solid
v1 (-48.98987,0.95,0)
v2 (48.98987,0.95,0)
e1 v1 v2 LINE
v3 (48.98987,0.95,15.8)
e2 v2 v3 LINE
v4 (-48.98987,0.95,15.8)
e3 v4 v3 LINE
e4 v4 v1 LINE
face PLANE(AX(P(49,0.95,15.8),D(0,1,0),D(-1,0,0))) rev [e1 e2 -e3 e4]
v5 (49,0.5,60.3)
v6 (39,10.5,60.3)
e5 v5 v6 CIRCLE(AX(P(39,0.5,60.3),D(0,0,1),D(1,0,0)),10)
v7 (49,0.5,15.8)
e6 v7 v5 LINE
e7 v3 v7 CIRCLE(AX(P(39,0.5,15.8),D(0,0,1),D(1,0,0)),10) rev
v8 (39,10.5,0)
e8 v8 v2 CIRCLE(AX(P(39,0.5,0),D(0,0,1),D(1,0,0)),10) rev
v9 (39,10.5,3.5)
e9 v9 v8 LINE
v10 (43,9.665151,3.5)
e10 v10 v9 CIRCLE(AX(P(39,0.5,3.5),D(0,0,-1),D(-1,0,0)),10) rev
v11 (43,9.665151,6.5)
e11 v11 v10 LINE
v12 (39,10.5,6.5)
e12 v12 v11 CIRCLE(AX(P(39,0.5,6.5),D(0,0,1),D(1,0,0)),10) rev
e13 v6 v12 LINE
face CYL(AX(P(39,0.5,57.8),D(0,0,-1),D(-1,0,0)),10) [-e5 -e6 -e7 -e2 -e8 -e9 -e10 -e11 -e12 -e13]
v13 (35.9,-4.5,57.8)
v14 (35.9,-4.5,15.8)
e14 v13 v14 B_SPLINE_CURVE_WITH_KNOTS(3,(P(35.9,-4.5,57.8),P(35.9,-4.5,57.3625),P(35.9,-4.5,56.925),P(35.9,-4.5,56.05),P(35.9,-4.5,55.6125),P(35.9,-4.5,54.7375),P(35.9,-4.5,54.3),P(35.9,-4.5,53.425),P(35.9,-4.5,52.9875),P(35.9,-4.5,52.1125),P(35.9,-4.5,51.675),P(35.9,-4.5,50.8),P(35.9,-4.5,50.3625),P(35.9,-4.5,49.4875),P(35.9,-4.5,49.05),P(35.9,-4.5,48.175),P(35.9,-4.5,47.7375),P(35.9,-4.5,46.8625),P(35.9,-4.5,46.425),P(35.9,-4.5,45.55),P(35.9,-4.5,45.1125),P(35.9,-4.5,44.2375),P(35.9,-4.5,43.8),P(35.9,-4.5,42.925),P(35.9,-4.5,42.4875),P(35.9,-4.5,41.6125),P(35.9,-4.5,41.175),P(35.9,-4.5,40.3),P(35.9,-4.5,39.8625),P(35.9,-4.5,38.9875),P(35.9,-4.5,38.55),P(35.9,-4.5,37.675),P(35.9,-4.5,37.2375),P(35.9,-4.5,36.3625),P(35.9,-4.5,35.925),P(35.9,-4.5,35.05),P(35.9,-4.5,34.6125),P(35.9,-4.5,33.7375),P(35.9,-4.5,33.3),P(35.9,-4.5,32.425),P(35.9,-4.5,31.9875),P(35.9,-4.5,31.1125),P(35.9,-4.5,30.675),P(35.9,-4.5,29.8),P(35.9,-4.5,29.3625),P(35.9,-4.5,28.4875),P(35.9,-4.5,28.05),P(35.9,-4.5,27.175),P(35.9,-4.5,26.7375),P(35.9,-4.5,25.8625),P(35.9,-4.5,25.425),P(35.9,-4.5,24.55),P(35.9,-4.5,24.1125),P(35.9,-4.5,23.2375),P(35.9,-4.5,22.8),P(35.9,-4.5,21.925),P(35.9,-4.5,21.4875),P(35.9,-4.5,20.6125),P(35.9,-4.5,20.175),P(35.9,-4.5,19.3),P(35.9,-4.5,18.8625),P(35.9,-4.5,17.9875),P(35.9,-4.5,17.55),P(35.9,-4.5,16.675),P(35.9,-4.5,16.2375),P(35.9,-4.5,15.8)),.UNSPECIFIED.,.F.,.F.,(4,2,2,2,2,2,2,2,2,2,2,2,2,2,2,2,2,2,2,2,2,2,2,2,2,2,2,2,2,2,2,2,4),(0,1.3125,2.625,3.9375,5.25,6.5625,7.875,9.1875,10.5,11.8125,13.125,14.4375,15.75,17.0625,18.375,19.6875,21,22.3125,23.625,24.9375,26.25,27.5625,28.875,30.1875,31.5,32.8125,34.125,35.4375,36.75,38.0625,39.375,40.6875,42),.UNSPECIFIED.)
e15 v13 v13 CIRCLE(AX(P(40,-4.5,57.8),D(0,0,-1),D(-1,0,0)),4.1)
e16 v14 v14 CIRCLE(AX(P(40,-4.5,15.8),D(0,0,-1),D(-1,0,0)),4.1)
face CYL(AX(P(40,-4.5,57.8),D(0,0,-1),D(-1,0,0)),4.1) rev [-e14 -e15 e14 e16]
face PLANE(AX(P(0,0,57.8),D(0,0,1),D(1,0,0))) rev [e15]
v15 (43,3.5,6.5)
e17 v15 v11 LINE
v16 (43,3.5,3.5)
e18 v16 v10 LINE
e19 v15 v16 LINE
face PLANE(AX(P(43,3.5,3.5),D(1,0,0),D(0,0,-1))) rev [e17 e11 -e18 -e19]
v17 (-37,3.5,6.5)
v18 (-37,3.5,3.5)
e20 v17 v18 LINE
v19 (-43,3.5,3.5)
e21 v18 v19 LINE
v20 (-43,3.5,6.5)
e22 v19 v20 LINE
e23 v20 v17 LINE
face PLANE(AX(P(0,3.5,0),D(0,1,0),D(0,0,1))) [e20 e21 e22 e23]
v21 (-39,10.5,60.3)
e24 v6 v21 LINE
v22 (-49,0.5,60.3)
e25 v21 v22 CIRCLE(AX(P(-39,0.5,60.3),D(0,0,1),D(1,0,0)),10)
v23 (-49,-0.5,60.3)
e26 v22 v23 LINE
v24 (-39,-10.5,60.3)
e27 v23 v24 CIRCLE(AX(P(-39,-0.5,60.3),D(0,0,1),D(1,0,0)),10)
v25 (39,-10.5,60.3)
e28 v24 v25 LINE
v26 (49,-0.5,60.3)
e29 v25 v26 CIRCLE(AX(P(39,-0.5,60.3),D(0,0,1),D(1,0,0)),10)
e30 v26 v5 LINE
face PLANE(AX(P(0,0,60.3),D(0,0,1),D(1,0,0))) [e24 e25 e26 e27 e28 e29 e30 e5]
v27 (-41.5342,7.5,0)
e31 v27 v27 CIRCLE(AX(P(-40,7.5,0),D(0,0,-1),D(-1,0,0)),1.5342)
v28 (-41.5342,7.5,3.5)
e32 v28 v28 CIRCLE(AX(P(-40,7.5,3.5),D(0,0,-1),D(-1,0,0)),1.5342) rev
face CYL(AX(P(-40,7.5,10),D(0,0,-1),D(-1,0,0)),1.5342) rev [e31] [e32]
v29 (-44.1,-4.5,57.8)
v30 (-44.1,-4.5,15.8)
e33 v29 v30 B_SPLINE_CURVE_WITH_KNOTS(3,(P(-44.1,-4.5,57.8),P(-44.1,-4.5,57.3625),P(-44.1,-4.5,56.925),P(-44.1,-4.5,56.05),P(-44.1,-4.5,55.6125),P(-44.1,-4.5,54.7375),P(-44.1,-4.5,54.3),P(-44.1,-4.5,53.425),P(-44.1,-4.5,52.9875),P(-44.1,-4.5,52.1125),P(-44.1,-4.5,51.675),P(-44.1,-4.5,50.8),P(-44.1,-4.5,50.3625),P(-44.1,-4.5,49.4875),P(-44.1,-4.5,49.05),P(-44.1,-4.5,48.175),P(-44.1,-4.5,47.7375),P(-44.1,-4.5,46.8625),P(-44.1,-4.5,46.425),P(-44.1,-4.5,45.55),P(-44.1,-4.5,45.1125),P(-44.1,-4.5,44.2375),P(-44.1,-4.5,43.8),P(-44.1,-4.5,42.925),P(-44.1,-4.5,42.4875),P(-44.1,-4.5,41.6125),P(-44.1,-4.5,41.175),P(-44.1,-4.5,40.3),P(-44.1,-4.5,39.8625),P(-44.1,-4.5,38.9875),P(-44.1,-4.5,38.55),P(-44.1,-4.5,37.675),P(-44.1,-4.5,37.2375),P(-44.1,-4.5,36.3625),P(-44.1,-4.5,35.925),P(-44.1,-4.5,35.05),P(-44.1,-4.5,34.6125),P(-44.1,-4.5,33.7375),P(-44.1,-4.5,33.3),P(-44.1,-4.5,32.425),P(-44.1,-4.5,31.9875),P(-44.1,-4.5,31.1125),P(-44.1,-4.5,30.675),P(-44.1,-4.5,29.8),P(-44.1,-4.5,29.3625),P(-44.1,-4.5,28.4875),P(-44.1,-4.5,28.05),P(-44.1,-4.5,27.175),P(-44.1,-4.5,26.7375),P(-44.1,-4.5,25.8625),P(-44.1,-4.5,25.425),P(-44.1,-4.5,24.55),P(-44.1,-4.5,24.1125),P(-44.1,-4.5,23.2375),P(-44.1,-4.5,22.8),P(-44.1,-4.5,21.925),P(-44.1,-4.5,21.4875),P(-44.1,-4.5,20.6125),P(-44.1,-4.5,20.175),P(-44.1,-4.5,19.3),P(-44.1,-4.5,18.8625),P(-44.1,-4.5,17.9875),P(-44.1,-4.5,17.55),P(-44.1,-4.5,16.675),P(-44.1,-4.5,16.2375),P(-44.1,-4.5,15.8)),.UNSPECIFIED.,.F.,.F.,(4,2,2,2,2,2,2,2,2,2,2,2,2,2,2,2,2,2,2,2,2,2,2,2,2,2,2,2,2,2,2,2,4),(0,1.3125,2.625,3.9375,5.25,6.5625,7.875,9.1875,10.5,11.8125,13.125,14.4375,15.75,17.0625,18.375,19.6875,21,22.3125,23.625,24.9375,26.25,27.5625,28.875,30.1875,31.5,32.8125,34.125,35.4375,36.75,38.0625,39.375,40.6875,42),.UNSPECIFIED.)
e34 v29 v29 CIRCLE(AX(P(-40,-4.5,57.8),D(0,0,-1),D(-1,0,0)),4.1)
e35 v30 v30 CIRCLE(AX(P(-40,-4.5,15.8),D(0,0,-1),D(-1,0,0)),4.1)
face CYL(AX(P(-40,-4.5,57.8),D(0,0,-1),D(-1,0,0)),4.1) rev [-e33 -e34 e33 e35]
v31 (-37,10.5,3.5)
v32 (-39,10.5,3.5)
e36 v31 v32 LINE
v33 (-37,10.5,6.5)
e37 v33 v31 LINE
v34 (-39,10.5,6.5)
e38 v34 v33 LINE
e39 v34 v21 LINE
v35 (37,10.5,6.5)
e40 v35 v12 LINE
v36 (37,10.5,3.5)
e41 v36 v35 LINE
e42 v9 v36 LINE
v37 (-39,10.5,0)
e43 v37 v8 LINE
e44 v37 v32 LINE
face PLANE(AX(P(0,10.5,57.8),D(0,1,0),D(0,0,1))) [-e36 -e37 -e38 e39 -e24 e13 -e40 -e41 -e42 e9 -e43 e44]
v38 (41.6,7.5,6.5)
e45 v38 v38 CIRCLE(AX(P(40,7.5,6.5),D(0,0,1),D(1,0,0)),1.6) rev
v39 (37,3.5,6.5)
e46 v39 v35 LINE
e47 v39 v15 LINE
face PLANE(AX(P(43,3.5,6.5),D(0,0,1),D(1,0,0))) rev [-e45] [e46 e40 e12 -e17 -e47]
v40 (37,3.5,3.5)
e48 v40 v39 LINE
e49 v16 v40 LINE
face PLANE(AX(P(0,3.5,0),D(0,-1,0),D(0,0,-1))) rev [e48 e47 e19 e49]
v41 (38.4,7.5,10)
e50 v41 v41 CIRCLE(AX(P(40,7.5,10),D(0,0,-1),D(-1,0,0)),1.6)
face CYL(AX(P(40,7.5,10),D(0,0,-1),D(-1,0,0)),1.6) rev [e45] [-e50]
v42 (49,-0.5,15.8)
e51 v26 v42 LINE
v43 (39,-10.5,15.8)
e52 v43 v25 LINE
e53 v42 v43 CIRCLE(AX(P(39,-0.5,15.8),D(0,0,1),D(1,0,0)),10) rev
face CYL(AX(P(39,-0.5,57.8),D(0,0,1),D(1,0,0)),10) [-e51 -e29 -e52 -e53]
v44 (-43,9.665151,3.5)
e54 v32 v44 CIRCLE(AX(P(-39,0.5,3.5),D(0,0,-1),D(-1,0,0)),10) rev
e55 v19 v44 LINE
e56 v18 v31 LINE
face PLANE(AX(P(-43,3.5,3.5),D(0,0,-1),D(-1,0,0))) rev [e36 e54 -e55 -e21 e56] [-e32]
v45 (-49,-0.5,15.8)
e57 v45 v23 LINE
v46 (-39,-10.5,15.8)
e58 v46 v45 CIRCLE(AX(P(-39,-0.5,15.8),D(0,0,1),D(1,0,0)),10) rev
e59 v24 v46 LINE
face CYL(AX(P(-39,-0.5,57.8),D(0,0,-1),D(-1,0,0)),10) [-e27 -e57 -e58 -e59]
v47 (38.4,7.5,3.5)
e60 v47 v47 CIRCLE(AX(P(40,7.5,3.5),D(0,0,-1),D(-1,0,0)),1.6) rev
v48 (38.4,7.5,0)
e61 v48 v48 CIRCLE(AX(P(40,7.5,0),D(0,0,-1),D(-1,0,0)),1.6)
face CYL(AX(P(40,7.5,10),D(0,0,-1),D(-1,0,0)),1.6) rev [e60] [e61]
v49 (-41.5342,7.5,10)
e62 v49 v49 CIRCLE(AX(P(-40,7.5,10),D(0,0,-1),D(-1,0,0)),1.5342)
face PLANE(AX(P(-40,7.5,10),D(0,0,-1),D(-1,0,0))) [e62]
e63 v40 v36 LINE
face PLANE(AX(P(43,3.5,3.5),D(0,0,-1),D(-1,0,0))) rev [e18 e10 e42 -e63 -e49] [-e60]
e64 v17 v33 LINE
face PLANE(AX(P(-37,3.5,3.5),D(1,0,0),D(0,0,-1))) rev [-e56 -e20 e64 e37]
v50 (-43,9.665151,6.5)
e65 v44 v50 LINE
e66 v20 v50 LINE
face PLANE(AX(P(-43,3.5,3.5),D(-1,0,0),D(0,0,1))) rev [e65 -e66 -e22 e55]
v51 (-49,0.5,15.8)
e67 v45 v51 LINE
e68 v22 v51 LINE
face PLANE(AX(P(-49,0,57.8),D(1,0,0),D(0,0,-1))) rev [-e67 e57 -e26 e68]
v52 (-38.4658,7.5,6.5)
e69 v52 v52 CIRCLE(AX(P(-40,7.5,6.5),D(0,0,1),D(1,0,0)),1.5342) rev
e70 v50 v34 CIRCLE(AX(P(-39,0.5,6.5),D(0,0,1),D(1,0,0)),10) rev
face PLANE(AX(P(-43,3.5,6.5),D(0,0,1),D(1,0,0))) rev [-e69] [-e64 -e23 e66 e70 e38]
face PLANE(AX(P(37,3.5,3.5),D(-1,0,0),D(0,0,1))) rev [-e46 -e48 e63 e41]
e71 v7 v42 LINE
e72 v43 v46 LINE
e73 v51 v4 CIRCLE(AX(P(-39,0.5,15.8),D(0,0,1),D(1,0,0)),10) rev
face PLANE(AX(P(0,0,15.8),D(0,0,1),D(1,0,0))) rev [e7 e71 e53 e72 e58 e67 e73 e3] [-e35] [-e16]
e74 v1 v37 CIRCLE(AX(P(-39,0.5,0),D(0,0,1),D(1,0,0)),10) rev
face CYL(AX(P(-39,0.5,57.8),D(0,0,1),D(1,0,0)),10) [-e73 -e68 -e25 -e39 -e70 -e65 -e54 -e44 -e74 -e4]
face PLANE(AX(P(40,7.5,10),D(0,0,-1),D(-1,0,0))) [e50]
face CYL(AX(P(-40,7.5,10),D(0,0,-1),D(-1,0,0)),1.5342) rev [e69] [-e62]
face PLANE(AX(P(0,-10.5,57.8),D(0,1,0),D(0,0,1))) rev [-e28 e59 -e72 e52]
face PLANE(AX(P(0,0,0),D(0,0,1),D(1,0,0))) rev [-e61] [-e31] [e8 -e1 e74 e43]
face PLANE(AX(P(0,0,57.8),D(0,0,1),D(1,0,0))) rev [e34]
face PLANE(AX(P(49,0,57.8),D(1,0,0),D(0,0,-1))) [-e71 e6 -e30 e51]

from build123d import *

# Parameters (mm, degrees)
SKETCH_1_W          = 49
SKETCH_1_H          = 21
SKETCH_1_R          = 4.1
SKETCH_1_R_2        = 1.6
EXTRUDE_1_DEPTH     = 57.8
SKETCH_4_W          = 98
SKETCH_4_H          = 11.45
CUT_EXTRUDE_3_DEPTH = 15.8
SKETCH_5_R          = 4.1
CUT_EXTRUDE_4_DEPTH = 42
SKETCH_6_W          = 98
SKETCH_6_H          = 21
EXTRUDE_2_DEPTH     = 2.5
SKETCH_7_R          = 1.6
SKETCH_7_R_2        = 1.534199572
CUT_EXTRUDE_5_DEPTH = 10
SKETCH_8_W          = 6
SKETCH_8_H          = 3
CUT_EXTRUDE_6_DEPTH = 7
FILLET_1_R          = 10
FILLET_2_R          = 10
FILLET_3_R          = 10
FILLET_4_R          = 10


with BuildPart() as part:
    # 草图1 → 凸台-拉伸1 (new body)
    # profile 1 of 6: a face of its own
    with BuildSketch(Plane.XY):
        with Locations((-24.5, 0)):
            Rectangle(SKETCH_1_W, SKETCH_1_H)
        with Locations((-40, -4.5)):
            Circle(SKETCH_1_R, mode=Mode.SUBTRACT)
        with Locations((-40, 7.5)):
            Circle(SKETCH_1_R_2, mode=Mode.SUBTRACT)
    # profile 2 of 6: a face of its own
    with BuildSketch(Plane.XY):
        with Locations((-40, -4.5)):
            Circle(SKETCH_1_R)
    # profile 3 of 6: a face of its own
    with BuildSketch(Plane.XY):
        with Locations((-40, 7.5)):
            Circle(SKETCH_1_R_2)
    # profile 4 of 6: a face of its own
    with BuildSketch(Plane.XY):
        with Locations((24.5, 0)):
            Rectangle(SKETCH_1_W, SKETCH_1_H)
        with Locations((40, -4.5)):
            Circle(SKETCH_1_R, mode=Mode.SUBTRACT)
        with Locations((40, 7.5)):
            Circle(SKETCH_1_R_2, mode=Mode.SUBTRACT)
    # profile 5 of 6: a face of its own
    with BuildSketch(Plane.XY):
        with Locations((40, -4.5)):
            Circle(SKETCH_1_R)
    # profile 6 of 6: a face of its own
    with BuildSketch(Plane.XY):
        with Locations((40, 7.5)):
            Circle(SKETCH_1_R_2)
    extrude(amount=EXTRUDE_1_DEPTH)

    # 草图4 → 切除-拉伸3 (cut)
    with BuildSketch(Plane(origin=(0, 0, 0), x_dir=(-1, 0, 0), z_dir=(0, 0, -1))):
        with Locations((0, -4.775)):
            Rectangle(SKETCH_4_W, SKETCH_4_H)
    extrude(amount=-CUT_EXTRUDE_3_DEPTH, mode=Mode.SUBTRACT)

    # 草图5 → 切除-拉伸4 (cut)
    with BuildSketch(Plane(origin=(0, 0, 15.8), x_dir=(-1, 0, 0), z_dir=(0, 0, -1))):
        with Locations((-40, -4.5)):
            Circle(SKETCH_5_R)
        with Locations((40, -4.5)):
            Circle(SKETCH_5_R)
    extrude(amount=-CUT_EXTRUDE_4_DEPTH, mode=Mode.SUBTRACT)

    # 草图6 → 凸台-拉伸2 (add)
    with BuildSketch(Plane.XY.offset(57.8)):
        Rectangle(SKETCH_6_W, SKETCH_6_H)
    extrude(amount=EXTRUDE_2_DEPTH)

    # 草图7 → 切除-拉伸5 (cut)
    with BuildSketch(Plane(origin=(0, 0, 0), x_dir=(-1, 0, 0), z_dir=(0, 0, -1))):
        with Locations((-40, 7.5)):
            Circle(SKETCH_7_R)
        with Locations((40, 7.5)):
            Circle(SKETCH_7_R_2)
    extrude(amount=-CUT_EXTRUDE_5_DEPTH, mode=Mode.SUBTRACT)

    # 草图8 → 切除-拉伸6 (cut)
    with BuildSketch(Plane(origin=(0, 10.5, 0), x_dir=(1, 0, 0), z_dir=(0, 1, 0))):
        with Locations((-40, -5)):
            Rectangle(SKETCH_8_W, SKETCH_8_H)
        with Locations((40, -5)):
            Rectangle(SKETCH_8_W, SKETCH_8_H)
    extrude(amount=-CUT_EXTRUDE_6_DEPTH, mode=Mode.SUBTRACT)

    # 圆角1
    # the kernel refuses this fillet: 10 mm, written as the material it takes off along each edge
    with BuildSketch(Plane(origin=(49, 10.5, -25), x_dir=(0, -1, 0), z_dir=(0, 0, 1))) as fillet_1_piece_1:
        with BuildLine():
            CenterArc((FILLET_1_R, -FILLET_1_R), FILLET_1_R, 90, 90)
            Line((0, -FILLET_1_R), (0, 0))
            Line((0, 0), (FILLET_1_R, 0))
        make_face()
    extrude(amount=110.3, mode=Mode.SUBTRACT)

    # 圆角2
    # the kernel refuses this fillet: 10 mm, written as the material it takes off along each edge
    with BuildSketch(Plane(origin=(-49, 10.5, 85.3), x_dir=(0, -1, 0), z_dir=(0, 0, -1))) as fillet_2_piece_1:
        with BuildLine():
            CenterArc((FILLET_2_R, -FILLET_2_R), FILLET_2_R, 90, 90)
            Line((0, -FILLET_2_R), (0, 0))
            Line((0, 0), (FILLET_2_R, 0))
        make_face()
    extrude(amount=110.3, mode=Mode.SUBTRACT)

    # 圆角3
    fillet_3_edges = [part.edges().sort_by_distance(p)[0] for p in [
        (-49, -10.5, 38.05),
    ]]
    fillet(fillet_3_edges, radius=FILLET_3_R)

    # 圆角4
    fillet_4_edges = [part.edges().sort_by_distance(p)[0] for p in [
        (49, -10.5, 38.05),
    ]]
    fillet(fillet_4_edges, radius=FILLET_4_R)


solid = part.part
